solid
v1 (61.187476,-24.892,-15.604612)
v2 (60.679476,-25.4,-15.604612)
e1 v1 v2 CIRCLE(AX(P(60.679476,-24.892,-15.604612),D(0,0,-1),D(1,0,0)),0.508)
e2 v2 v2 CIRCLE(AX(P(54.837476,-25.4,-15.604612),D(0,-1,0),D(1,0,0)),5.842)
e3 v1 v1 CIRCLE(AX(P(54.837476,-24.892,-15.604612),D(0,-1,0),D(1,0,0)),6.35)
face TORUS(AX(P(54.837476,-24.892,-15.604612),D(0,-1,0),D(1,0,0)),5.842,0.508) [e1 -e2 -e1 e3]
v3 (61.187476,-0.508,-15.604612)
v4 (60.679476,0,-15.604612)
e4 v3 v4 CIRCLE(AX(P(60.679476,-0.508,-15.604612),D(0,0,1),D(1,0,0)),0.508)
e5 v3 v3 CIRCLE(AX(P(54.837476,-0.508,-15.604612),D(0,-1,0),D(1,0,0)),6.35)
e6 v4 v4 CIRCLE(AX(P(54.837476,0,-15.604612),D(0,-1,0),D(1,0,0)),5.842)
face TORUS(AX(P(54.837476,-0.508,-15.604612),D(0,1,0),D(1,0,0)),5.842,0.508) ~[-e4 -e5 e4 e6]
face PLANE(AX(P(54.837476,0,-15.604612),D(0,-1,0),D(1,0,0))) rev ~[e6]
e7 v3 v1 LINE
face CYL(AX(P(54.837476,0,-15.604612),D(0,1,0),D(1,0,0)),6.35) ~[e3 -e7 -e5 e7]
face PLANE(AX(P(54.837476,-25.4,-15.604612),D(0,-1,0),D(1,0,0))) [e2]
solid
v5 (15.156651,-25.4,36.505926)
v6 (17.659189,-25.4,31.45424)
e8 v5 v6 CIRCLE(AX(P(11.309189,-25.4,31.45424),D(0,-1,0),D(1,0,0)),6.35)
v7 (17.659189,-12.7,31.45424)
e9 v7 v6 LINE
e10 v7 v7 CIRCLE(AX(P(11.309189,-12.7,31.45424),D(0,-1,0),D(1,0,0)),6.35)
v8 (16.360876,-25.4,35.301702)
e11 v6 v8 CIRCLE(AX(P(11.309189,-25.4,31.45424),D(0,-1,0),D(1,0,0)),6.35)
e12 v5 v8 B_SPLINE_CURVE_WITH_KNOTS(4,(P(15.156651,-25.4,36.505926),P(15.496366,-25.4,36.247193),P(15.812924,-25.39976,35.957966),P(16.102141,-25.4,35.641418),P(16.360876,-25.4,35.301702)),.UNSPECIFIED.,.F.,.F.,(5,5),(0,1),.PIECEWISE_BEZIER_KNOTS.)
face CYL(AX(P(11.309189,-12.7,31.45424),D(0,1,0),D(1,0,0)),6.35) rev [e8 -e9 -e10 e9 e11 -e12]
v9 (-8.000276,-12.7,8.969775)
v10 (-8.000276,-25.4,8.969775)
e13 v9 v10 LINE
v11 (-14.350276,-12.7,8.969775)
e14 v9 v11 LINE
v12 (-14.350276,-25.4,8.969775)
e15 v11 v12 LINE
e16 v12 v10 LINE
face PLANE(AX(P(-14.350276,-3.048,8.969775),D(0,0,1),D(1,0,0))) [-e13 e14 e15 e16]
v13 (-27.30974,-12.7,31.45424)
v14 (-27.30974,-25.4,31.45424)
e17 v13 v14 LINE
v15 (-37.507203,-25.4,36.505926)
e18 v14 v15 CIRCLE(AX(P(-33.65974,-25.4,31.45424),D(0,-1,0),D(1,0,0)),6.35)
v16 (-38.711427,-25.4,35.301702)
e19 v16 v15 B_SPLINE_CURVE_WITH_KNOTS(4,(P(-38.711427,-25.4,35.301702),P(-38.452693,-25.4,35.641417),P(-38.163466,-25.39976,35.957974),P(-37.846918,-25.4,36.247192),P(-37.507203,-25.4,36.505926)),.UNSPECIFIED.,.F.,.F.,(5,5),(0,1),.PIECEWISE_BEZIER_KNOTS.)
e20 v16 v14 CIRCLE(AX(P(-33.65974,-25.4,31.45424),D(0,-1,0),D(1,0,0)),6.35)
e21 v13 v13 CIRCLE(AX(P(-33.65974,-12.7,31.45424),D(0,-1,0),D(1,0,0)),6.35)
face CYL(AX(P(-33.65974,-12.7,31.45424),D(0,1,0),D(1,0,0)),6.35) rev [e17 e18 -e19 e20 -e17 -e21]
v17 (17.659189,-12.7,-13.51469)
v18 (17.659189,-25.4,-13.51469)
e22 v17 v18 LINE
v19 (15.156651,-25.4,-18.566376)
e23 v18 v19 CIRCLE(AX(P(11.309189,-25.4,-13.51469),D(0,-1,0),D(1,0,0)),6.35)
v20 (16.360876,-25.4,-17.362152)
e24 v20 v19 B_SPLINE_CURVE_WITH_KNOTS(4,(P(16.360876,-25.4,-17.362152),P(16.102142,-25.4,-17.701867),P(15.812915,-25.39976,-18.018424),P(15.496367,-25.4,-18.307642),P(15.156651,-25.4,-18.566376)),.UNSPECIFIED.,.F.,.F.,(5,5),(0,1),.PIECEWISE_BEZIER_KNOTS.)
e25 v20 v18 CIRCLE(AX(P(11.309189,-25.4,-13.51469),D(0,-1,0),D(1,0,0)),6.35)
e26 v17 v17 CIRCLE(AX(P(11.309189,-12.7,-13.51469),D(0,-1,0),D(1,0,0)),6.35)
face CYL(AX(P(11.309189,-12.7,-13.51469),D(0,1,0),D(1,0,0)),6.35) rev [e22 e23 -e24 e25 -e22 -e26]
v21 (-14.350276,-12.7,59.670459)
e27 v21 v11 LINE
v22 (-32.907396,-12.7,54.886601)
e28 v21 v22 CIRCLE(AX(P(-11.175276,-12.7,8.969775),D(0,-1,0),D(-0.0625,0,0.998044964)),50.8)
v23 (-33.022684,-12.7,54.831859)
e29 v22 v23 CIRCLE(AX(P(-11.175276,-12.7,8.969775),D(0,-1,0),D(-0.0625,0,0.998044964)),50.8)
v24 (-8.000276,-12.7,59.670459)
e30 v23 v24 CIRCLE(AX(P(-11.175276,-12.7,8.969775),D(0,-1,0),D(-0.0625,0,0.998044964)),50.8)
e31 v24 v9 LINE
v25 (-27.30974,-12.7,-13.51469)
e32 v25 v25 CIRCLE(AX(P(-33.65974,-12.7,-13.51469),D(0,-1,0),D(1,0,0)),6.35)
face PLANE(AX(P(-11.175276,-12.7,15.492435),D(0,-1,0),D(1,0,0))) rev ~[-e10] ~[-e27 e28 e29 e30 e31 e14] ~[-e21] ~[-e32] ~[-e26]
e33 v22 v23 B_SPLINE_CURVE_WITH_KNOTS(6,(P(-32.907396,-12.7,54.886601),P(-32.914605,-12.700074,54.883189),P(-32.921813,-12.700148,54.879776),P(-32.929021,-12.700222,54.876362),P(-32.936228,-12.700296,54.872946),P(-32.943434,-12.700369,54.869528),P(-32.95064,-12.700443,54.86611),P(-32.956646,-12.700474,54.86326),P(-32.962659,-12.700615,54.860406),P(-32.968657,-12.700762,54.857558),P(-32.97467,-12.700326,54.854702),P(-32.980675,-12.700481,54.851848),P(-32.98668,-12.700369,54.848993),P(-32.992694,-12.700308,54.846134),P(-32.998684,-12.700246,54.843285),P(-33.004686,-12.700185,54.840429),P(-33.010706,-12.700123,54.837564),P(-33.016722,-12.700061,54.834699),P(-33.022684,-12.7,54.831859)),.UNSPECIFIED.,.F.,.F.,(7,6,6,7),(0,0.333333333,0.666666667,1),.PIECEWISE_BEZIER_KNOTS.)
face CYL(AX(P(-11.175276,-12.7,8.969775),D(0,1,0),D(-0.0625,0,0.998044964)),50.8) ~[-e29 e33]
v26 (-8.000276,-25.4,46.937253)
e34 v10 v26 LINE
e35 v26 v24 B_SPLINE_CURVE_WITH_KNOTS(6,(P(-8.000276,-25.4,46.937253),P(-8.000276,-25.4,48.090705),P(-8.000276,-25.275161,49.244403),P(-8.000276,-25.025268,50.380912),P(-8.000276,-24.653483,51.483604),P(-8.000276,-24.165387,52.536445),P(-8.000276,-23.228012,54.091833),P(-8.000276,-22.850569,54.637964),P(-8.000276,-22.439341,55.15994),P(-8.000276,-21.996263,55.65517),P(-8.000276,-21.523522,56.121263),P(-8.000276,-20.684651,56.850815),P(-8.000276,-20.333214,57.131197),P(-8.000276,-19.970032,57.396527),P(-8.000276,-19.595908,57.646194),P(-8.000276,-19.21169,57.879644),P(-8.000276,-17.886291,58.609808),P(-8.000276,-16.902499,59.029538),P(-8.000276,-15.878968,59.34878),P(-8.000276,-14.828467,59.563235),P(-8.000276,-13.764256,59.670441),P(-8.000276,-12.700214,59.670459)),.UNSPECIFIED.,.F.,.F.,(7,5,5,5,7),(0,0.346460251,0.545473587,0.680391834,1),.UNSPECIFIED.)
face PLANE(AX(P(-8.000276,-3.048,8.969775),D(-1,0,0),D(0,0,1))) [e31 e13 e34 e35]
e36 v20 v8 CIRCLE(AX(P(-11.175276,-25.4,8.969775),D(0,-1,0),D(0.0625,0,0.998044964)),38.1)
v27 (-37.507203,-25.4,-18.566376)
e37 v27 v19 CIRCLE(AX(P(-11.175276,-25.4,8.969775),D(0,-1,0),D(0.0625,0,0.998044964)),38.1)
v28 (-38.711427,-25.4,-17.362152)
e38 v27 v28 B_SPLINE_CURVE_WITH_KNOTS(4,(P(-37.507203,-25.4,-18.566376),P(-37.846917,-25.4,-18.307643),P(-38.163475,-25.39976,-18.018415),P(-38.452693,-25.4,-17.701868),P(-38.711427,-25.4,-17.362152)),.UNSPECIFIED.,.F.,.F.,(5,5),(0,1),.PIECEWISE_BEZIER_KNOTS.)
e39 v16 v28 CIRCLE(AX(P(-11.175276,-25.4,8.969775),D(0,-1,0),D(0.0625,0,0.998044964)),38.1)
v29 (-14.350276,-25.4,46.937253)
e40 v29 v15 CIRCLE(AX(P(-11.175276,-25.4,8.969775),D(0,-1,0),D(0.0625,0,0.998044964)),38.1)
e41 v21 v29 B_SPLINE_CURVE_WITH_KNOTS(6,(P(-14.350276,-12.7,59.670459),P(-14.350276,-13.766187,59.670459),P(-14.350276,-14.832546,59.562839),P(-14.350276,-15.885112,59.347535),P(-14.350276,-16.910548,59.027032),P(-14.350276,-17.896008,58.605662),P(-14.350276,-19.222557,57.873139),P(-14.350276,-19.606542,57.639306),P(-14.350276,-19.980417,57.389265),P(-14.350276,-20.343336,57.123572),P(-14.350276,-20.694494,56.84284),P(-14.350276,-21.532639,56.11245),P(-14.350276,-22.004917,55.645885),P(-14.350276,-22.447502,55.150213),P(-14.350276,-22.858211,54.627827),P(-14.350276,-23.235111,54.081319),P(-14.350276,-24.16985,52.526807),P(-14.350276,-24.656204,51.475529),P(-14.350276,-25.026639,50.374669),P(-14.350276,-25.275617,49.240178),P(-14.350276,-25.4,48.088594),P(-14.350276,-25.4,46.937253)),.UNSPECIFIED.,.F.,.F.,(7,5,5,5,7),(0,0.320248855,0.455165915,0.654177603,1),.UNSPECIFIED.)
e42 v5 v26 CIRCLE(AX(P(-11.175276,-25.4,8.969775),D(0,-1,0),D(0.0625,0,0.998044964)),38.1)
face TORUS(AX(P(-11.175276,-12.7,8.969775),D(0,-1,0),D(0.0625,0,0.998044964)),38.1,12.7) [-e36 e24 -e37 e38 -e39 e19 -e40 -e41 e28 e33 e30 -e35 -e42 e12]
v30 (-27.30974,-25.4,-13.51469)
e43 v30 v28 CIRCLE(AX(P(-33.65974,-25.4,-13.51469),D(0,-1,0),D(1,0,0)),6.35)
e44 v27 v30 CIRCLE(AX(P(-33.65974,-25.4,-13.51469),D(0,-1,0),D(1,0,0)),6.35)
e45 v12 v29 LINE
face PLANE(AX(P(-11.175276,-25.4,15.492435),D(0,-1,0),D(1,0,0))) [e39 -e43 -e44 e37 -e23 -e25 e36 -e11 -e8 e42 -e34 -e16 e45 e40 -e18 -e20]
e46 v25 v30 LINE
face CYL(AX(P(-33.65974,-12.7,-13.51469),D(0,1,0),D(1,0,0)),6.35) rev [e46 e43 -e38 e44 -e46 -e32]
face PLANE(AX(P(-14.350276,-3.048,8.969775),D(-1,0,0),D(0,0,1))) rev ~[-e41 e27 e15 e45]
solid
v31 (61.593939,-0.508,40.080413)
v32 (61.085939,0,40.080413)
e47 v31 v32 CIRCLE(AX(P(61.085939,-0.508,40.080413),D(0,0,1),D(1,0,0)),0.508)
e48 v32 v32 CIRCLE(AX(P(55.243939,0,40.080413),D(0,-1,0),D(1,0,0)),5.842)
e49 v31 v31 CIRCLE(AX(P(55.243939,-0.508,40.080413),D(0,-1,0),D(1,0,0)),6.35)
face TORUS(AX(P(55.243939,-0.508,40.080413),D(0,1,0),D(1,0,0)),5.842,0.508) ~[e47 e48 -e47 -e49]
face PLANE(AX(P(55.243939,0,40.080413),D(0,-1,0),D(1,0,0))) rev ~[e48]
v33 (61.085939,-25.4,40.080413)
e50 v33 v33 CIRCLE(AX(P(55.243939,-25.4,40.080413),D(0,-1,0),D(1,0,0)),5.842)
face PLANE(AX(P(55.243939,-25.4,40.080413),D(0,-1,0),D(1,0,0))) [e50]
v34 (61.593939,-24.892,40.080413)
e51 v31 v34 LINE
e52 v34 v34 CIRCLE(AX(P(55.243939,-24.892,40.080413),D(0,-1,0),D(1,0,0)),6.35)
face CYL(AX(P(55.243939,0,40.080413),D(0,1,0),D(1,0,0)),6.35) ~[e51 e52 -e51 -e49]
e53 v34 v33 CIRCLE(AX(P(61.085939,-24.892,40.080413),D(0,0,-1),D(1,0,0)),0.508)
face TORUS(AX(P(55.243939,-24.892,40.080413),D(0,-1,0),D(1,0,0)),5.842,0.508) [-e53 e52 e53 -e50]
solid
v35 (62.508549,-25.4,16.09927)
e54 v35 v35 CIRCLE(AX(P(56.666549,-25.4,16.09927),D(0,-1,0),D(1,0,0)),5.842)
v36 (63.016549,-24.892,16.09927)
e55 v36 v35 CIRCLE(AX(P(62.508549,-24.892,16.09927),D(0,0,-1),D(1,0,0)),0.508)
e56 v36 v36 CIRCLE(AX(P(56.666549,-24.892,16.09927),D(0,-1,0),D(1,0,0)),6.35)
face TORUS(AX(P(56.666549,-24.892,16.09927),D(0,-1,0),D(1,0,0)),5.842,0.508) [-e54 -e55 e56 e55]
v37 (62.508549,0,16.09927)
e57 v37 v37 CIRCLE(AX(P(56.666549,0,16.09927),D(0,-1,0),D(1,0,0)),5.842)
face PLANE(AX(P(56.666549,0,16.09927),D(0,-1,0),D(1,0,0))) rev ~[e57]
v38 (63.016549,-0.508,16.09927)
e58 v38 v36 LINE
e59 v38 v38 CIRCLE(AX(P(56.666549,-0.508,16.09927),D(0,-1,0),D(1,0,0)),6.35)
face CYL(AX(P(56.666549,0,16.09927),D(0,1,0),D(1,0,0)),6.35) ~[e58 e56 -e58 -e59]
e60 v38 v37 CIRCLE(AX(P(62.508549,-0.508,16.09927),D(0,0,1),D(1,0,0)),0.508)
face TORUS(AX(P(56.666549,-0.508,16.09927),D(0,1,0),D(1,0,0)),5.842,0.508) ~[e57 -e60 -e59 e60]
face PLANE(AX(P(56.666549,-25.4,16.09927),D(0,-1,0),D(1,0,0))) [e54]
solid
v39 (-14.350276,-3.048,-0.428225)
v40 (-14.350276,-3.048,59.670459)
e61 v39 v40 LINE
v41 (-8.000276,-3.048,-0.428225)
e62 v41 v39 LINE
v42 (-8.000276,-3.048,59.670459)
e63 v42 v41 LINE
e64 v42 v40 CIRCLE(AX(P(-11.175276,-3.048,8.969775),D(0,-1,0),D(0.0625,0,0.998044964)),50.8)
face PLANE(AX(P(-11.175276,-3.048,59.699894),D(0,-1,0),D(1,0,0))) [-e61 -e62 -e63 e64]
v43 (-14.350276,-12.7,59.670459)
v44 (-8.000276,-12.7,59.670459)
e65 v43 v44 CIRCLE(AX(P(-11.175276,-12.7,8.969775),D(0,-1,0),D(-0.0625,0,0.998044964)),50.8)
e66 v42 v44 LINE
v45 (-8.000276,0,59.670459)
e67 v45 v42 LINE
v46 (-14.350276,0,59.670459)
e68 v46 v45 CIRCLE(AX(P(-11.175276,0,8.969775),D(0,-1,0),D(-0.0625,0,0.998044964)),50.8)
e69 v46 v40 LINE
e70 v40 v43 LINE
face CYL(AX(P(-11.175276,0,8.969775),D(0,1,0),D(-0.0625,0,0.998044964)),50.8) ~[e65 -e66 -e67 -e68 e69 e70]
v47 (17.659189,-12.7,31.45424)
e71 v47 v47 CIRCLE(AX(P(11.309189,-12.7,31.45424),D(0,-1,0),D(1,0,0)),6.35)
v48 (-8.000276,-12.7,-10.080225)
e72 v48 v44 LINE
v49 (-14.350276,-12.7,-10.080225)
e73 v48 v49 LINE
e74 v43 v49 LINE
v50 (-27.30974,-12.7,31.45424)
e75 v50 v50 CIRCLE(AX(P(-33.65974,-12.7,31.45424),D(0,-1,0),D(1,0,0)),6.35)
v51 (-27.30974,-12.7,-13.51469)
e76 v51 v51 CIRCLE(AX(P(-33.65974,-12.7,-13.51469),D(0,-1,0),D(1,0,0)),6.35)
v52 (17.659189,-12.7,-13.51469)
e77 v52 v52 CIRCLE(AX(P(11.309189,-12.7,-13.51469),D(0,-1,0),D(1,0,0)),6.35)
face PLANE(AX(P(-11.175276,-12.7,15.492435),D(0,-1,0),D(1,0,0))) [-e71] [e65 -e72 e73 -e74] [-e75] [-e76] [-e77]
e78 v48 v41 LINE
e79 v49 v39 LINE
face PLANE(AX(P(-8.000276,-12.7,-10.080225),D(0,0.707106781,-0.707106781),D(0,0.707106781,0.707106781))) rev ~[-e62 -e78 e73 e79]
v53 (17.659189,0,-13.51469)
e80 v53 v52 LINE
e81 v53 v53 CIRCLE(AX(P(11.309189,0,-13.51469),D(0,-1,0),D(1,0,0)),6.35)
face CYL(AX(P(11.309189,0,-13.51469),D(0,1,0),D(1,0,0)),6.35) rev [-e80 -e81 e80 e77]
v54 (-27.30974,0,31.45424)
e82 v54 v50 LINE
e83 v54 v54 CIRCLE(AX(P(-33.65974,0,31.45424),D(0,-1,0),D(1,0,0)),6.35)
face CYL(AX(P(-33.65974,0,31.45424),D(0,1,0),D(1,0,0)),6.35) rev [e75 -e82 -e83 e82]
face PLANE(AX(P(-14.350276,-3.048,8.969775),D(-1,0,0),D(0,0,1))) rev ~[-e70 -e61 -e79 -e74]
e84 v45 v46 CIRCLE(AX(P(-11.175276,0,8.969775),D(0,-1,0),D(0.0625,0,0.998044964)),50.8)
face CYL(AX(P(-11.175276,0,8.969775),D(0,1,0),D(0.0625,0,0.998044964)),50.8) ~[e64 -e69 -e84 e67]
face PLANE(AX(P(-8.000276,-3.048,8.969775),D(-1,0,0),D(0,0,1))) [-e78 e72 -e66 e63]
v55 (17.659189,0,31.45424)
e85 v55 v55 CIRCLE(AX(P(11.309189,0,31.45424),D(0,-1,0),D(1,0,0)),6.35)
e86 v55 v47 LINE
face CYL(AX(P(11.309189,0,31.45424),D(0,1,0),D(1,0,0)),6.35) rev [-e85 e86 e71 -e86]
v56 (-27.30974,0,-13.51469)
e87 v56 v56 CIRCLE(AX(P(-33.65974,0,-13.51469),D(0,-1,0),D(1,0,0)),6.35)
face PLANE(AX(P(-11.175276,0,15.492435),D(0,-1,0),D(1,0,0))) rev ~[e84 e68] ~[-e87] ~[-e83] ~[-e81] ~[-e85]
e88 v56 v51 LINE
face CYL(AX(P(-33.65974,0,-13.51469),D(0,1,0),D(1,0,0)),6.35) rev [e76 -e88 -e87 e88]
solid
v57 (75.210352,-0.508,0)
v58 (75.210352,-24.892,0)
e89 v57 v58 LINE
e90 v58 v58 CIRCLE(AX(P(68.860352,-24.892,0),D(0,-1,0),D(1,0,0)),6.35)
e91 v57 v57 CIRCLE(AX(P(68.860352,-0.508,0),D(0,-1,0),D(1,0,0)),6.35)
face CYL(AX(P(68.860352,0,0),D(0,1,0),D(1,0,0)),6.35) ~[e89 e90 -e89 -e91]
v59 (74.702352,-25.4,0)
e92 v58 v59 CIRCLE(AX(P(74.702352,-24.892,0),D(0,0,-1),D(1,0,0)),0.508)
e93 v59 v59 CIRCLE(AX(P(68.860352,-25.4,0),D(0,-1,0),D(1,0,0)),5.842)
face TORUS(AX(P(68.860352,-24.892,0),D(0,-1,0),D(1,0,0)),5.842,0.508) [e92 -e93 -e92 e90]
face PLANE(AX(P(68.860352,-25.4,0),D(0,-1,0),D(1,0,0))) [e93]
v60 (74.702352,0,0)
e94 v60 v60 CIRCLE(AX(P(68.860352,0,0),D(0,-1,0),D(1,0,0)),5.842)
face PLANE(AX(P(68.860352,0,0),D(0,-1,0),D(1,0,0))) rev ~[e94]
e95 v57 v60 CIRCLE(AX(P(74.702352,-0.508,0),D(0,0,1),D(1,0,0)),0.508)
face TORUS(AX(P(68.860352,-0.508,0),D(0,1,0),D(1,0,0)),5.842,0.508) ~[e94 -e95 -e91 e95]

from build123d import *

# Parameters (mm, degrees)
F0_R        = 6.35
F0_W        = 6.35
F0_H        = 50.700684167
F1_DEPTH    = 12.7
F2_DEPTH    = 12.7
F4_START    = 3.048
F4_DEPTH    = 22.352
F5_T4_DEPTH = 6.35
F6_R        = 6.35
F7_DEPTH    = 25.4
F8_R        = 0.508
F8_2_R      = 0.508
F8_3_R      = 0.508
F8_4_R      = 0.508


# Not quite as in the source:
# - a fillet or chamfer that OpenCascade refuses, or shapes differently, is made with other operations: its cross-section is extruded or revolved along the edge and cut away or added


with BuildPart() as f1:
    # F0 (on Front) → F1 (new body)
    with BuildSketch(Plane.XZ):
        with BuildLine():
            ThreePointArc((-14.3502756187, 59.6704592896), (-45.9556580202, -28.0567694096), (39.6247243813, 8.9697751226))
            ThreePointArc((39.6247243813, 8.9697751226), (25.8512689136, 43.7501575242), (-8.0002756187, 59.6704592896))
            Line((-8.0002756187, 59.6704592896), (-8.0002756187, 8.9697751226))
            Line((-8.0002756187, 8.9697751226), (-14.3502756187, 8.9697751226))
            Line((-14.3502756187, 8.9697751226), (-14.3502756187, 59.6704592896))
        make_face()
        with Locations((-33.6597404378, -13.5146896965)):
            Circle(F0_R, mode=Mode.SUBTRACT)
        with Locations((11.3091892005, -13.5146896965)):
            Circle(F0_R, mode=Mode.SUBTRACT)
        with Locations((-33.6597404378, 31.4542399417)):
            Circle(F0_R, mode=Mode.SUBTRACT)
        with Locations((11.3091892005, 31.4542399417)):
            Circle(F0_R, mode=Mode.SUBTRACT)
        with BuildLine():
            Line((-14.3502756187, 59.6704592896), (-8.0002756187, 59.6704592896))
            ThreePointArc((-8.0002756187, 59.6704592896), (-11.1752756187, 59.7697751226), (-14.3502756187, 59.6704592896))
        make_face()
        with Locations((-11.1752756187, 34.3201172061)):
            Rectangle(F0_W, F0_H)
    extrude(amount=F1_DEPTH)


with BuildPart() as f2:
    # F2 (new): a face of the model
    f2_faces = [f1.part.faces().sort_by_distance(p)[0] for p in [
        (-11.1752756187, -12.7, 8.9697751226),
    ]]
    extrude(f2_faces, amount=F2_DEPTH)

    # F3: fillet of radius 12.7 on 1 edges, made by hand

    # F3_s1 → F3_t2 (revolve, cut)
    with BuildSketch(Plane(origin=(-11.6911371288, 0, 0.732127406), x_dir=(0, 1, 0), z_dir=(0.9980449639, 0, -0.0625))):
        with BuildLine():
            ThreePointArc((-12.7, 59.0537841624), (-21.6802561211, 55.3340402835), (-25.4, 46.3537841624))
            Line((-25.4, 46.3537841624), (-25.4, 59.0537841624))
            Line((-25.4, 59.0537841624), (-12.7, 59.0537841624))
        make_face()
    revolve(axis=Axis((-11.1752756187, -25.4, 8.9697751226), (0, -1, 0)), mode=Mode.SUBTRACT)


with BuildPart() as f4_tool:
    # F0 (on Front) → F4 (new body)
    with BuildSketch(Plane.XZ.offset(F4_START)):
        with BuildLine():
            Line((-14.3502756187, 59.6704592896), (-8.0002756187, 59.6704592896))
            ThreePointArc((-8.0002756187, 59.6704592896), (-11.1752756187, 59.7697751226), (-14.3502756187, 59.6704592896))
        make_face()
        with Locations((-11.1752756187, 34.3201172061)):
            Rectangle(F0_W, F0_H)
    extrude(amount=F4_DEPTH)


with BuildPart() as f1_1:
    add(f1.part)

    # F4: cut by f4_tool
    add(f4_tool.part, mode=Mode.SUBTRACT)

    # F5: chamfer of 19.05 on 1 edges, made by hand


with BuildPart() as f2_1:
    add(f2.part)

    # F4: cut by f4_tool
    add(f4_tool.part, mode=Mode.SUBTRACT)


with BuildPart() as f5_tool2:
    # F5_s3 → F5_t4 (new body)
    with BuildSketch(Plane.YZ.offset(-8.0002756187)):
        Polygon((-12.7, -10.0802248774), (6.35, 8.9697751226), (-12.7, 8.9697751226), align=None)
    extrude(amount=-F5_T4_DEPTH)

    split(bisect_by=Plane.XZ.offset(3.048), keep=Keep.TOP)


with BuildPart() as f1_2:
    add(f1_1.part)

    # F5_t1: cut F5_tool2
    add(f5_tool2.part, mode=Mode.SUBTRACT)


with BuildPart() as f7:
    # F6 (on Front) → F7 (new body)
    with BuildSketch(Plane.XZ):
        with Locations((55.2439391613, 40.0804132223)):
            Circle(F6_R)
    extrude(amount=F7_DEPTH)

    # F8
    f8_edges = [f7.edges().sort_by_distance(p)[0] for p in [
        (48.893939, -25.4, 40.080413),
        (48.893939, 0, 40.080413),
    ]]
    fillet(f8_edges, radius=F8_R)


with BuildPart() as f7b:
    # F6 (on Front) → F7, piece 2 (new body)
    with BuildSketch(Plane.XZ):
        with Locations((56.6665492952, 16.0992704332)):
            Circle(F6_R)
    extrude(amount=F7_DEPTH)

    # F8#2
    f8_2_edges = [f7b.edges().sort_by_distance(p)[0] for p in [
        (50.316549, -25.4, 16.09927),
        (50.316549, 0, 16.09927),
    ]]
    fillet(f8_2_edges, radius=F8_2_R)


with BuildPart() as f7c:
    # F6 (on Front) → F7, piece 3 (new body)
    with BuildSketch(Plane.XZ):
        with Locations((54.8374764621, -15.6046124175)):
            Circle(F6_R)
    extrude(amount=F7_DEPTH)

    # F8#3
    f8_3_edges = [f7c.edges().sort_by_distance(p)[0] for p in [
        (48.487476, 0, -15.604612),
        (48.487476, -25.4, -15.604612),
    ]]
    fillet(f8_3_edges, radius=F8_3_R)


with BuildPart() as f7d:
    # F6 (on Front) → F7, piece 4 (new body)
    with BuildSketch(Plane.XZ):
        with Locations((68.8603520393, 0)):
            Circle(F6_R)
    extrude(amount=F7_DEPTH)

    # F8#4
    f8_4_edges = [f7d.edges().sort_by_distance(p)[0] for p in [
        (62.510352, -25.4, 0),
        (62.510352, 0, 0),
    ]]
    fillet(f8_4_edges, radius=F8_4_R)


solid = Compound([f2_1.part, f1_2.part, f7.part, f7b.part, f7c.part, f7d.part])
